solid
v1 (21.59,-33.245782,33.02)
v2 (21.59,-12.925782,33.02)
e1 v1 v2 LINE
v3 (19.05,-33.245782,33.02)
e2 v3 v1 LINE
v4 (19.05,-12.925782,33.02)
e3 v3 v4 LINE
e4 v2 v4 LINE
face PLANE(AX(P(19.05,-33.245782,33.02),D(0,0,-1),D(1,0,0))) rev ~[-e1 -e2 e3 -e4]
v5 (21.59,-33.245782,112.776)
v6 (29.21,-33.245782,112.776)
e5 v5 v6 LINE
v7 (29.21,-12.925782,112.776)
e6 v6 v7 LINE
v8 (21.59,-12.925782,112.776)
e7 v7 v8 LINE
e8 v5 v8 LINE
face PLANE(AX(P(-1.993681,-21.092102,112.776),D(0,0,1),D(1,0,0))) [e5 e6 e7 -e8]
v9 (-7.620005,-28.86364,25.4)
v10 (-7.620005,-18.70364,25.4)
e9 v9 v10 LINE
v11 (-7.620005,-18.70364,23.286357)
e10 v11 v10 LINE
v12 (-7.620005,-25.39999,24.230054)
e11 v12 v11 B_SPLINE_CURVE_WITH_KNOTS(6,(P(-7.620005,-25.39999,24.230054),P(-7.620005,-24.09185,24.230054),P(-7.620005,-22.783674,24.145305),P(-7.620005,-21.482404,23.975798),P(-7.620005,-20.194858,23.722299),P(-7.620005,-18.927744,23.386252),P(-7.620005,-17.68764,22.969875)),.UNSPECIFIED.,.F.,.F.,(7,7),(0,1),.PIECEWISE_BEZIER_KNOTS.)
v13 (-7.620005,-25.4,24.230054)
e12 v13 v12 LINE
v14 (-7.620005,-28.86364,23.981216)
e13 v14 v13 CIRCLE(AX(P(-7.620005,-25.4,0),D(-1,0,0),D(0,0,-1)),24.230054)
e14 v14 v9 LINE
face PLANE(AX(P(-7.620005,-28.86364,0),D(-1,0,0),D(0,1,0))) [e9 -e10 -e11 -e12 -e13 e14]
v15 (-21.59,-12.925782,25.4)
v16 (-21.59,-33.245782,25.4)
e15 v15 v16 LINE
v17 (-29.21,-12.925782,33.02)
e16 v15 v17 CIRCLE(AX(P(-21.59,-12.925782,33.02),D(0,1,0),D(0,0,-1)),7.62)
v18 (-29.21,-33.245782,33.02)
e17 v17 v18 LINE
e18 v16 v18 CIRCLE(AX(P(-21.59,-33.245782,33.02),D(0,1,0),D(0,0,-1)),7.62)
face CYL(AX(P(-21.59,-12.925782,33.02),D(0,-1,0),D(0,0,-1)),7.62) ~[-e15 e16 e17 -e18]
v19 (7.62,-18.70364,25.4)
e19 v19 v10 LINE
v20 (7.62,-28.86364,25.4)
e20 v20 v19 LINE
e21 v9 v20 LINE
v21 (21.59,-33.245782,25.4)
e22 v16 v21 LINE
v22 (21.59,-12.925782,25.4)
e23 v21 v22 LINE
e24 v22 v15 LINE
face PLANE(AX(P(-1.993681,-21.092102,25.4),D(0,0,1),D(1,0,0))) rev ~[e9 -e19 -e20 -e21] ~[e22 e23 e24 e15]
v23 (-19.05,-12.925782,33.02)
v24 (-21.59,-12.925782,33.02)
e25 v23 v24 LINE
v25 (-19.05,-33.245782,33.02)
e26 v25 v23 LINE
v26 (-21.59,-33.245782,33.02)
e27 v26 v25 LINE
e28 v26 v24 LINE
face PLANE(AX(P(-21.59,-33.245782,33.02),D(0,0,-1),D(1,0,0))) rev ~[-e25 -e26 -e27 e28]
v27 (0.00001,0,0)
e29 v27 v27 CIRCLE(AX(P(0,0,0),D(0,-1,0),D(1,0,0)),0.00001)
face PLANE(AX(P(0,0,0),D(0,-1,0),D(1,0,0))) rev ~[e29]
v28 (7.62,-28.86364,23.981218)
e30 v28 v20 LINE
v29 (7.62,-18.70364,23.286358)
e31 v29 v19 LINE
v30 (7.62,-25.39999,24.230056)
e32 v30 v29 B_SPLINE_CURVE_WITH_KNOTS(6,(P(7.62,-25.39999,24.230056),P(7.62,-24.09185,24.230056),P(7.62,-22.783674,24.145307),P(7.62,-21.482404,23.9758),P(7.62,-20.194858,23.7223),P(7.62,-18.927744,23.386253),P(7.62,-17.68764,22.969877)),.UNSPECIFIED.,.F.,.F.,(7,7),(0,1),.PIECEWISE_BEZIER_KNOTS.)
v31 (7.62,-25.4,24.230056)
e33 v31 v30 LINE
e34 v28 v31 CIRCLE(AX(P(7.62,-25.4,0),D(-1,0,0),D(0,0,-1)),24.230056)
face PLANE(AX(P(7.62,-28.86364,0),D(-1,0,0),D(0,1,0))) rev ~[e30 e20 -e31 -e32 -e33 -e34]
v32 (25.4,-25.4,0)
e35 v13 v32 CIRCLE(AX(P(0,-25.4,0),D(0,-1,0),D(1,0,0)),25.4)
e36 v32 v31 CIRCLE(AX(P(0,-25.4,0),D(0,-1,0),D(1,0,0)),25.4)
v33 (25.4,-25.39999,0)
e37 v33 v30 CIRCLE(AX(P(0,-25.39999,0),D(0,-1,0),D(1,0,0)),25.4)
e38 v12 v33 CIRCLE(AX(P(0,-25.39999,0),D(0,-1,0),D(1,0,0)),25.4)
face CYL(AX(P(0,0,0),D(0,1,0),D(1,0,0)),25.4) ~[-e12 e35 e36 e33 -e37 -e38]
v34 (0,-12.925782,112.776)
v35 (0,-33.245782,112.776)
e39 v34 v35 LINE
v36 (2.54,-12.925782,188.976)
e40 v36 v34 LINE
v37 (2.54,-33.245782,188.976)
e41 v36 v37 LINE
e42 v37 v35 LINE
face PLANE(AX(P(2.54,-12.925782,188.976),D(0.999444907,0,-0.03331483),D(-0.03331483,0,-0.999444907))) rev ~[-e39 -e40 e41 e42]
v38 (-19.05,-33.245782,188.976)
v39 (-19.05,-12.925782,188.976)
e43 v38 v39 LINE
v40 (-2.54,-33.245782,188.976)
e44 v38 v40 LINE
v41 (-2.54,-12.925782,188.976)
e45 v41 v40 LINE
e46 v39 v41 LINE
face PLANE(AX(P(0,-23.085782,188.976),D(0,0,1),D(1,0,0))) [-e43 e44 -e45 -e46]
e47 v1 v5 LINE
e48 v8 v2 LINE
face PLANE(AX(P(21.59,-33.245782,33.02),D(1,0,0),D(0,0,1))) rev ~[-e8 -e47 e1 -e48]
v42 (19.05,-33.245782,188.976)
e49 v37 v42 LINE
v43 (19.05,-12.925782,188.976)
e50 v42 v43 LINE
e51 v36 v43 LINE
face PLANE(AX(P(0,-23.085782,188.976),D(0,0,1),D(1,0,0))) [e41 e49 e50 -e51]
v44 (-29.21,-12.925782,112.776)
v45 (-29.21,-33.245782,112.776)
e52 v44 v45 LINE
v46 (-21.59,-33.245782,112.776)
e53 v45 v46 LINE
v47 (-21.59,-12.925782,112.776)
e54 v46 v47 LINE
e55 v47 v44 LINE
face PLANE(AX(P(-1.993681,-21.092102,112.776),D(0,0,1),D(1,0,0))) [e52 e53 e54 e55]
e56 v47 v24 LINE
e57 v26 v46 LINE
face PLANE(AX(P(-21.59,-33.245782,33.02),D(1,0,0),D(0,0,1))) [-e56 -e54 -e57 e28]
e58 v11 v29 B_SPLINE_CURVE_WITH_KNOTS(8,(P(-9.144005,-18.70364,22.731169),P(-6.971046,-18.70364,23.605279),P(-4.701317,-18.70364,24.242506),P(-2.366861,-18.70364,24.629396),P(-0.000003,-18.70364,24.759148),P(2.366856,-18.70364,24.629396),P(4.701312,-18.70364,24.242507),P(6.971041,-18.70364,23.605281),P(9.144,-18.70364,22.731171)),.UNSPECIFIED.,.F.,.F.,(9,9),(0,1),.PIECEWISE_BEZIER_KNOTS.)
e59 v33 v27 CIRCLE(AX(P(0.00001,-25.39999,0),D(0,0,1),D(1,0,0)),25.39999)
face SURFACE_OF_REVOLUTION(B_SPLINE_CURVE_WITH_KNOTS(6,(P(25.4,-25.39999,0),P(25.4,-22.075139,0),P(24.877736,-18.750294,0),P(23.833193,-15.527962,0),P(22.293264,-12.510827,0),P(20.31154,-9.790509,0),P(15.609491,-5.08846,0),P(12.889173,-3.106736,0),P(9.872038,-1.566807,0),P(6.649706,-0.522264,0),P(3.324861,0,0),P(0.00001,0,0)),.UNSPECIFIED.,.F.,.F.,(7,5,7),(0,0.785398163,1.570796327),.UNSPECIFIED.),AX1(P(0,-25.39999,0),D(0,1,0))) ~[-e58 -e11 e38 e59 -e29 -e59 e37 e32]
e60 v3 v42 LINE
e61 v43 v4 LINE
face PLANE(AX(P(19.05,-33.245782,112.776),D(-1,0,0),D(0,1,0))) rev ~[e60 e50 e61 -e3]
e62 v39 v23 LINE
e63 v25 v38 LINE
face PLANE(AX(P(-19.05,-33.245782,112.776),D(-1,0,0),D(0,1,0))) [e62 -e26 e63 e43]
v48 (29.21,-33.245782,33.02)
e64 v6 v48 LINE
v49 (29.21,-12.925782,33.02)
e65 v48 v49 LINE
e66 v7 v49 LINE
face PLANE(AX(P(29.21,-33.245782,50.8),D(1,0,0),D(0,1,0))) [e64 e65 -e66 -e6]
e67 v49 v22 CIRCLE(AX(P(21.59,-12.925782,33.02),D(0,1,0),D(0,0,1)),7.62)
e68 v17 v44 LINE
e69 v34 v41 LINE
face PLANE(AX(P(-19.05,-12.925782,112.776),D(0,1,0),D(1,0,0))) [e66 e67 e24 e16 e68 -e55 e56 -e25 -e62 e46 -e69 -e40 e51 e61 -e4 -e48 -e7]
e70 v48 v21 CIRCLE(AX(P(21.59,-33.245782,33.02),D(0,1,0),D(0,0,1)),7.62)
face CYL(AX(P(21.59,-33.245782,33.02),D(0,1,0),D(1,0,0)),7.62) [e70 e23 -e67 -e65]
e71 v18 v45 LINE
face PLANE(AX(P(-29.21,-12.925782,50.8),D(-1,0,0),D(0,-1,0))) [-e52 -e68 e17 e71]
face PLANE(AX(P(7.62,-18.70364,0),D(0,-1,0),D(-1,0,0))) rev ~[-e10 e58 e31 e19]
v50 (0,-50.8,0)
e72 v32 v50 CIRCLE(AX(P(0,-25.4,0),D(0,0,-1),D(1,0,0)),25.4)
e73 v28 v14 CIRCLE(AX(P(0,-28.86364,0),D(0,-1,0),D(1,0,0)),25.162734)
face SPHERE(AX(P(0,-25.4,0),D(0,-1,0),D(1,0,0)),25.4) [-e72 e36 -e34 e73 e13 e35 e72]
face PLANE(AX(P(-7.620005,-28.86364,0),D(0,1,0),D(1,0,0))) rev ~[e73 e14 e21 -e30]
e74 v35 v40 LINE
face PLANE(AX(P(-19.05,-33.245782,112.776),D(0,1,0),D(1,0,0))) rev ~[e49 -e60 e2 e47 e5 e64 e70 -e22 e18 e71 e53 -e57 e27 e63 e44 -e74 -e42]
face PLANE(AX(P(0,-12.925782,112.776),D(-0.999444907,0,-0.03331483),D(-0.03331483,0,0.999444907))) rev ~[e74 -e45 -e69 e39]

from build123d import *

# Parameters (mm, degrees)
F0_R          = 25.4
F1_DEPTH      = 50.8
F2_R          = 25.4
F3_R          = 25.39999
F4_W          = 7.62
F4_H          = 10.16
F4_W_2        = 7.6200046011
F5_DEPTH      = 50.8
F6_W          = 21.59
F6_H          = 14.5421422695
F7_DEPTH      = 61.976
F7_DEPTH_BACK = 25.4
F8_R          = 7.62
F9_R          = 7.62
F10_W         = 2.54
F10_H         = 79.756
F11_DEPTH     = 25.4
F12_W         = 38.1
F12_H         = 20.32
F13_DEPTH     = 76.2
F15_DEPTH     = 25.4


# Not quite as in the source:
# - a fillet or chamfer is up to 0.001 mm smaller than in the source, because OpenCascade refuses the exact size


with BuildPart() as f1:
    # F0 (on Front) → F1 (new body)
    with BuildSketch(Plane.XZ):
        Circle(F0_R)
    extrude(amount=F1_DEPTH)

    # F2
    f2_edges = [f1.edges().sort_by_distance(p)[0] for p in [
        (-25.4, -50.8, 0),
    ]]
    fillet(f2_edges, radius=F2_R)

    # F3 (radius 25.4 in the source; OpenCascade refuses exactly that, so slightly less here)
    f3_edges = [f1.edges().sort_by_distance(p)[0] for p in [
        (-25.4, 0, 0),
    ]]
    fillet(f3_edges, radius=F3_R)

    # F4 (on Top) → F5 (join)
    with BuildSketch(Plane.XY):
        with Locations((3.81, -23.7836401282)):
            Rectangle(F4_W, F4_H)
        with Locations((-3.8100023006, -23.7836401282)):
            Rectangle(F4_W_2, F4_H)
    extrude(amount=F5_DEPTH)

    # F6 (on face) → F7 (join, two sides)
    with BuildSketch(Plane.XY.offset(50.8)) as f7_sk:
        Polygon((7.62, -33.2457823977), (7.62, -18.7036401282), (29.21, -18.7036401282), (29.21, -12.9257823977), (-29.21, -12.9257823977), (-29.21, -18.7036401282), (-29.21, -33.2457823977), align=None)
        with Locations((18.415, -25.9747112629)):
            Rectangle(F6_W, F6_H)
    extrude(amount=F7_DEPTH)
    extrude(f7_sk.sketch, amount=-F7_DEPTH_BACK)

    # F8
    f8_edges = [f1.edges().sort_by_distance(p)[0] for p in [
        (29.21, -23.085782, 25.4),
    ]]
    fillet(f8_edges, radius=F8_R)

    # F9
    f9_edges = [f1.edges().sort_by_distance(p)[0] for p in [
        (-29.21, -23.085782, 25.4),
    ]]
    fillet(f9_edges, radius=F9_R)

    # F10 (on face) → F11 (cut)
    with BuildSketch(Plane.XZ.offset(33.2457823977)):
        with Locations((20.32, 72.898)):
            Rectangle(F10_W, F10_H)
        with Locations((-20.32, 72.898)):
            Rectangle(F10_W, F10_H)
    extrude(amount=-F11_DEPTH, mode=Mode.SUBTRACT)

    # F12 (on face) → F13 (join)
    with BuildSketch(Plane.XY.offset(112.776)):
        with Locations((0, -23.0857823977)):
            Rectangle(F12_W, F12_H)
    extrude(amount=F13_DEPTH)

    # F14 (on face) → F15 (cut)
    with BuildSketch(Plane(origin=(0, -12.9257823977, 0), x_dir=(-1, 0, 0), z_dir=(0, 1, 0))):
        Polygon((-2.54, 188.976), (0, 112.776), (0, 188.976), align=None)
        Polygon((0, 188.976), (0, 112.776), (2.54, 188.976), align=None)
    extrude(amount=-F15_DEPTH, mode=Mode.SUBTRACT)


solid = f1.part
